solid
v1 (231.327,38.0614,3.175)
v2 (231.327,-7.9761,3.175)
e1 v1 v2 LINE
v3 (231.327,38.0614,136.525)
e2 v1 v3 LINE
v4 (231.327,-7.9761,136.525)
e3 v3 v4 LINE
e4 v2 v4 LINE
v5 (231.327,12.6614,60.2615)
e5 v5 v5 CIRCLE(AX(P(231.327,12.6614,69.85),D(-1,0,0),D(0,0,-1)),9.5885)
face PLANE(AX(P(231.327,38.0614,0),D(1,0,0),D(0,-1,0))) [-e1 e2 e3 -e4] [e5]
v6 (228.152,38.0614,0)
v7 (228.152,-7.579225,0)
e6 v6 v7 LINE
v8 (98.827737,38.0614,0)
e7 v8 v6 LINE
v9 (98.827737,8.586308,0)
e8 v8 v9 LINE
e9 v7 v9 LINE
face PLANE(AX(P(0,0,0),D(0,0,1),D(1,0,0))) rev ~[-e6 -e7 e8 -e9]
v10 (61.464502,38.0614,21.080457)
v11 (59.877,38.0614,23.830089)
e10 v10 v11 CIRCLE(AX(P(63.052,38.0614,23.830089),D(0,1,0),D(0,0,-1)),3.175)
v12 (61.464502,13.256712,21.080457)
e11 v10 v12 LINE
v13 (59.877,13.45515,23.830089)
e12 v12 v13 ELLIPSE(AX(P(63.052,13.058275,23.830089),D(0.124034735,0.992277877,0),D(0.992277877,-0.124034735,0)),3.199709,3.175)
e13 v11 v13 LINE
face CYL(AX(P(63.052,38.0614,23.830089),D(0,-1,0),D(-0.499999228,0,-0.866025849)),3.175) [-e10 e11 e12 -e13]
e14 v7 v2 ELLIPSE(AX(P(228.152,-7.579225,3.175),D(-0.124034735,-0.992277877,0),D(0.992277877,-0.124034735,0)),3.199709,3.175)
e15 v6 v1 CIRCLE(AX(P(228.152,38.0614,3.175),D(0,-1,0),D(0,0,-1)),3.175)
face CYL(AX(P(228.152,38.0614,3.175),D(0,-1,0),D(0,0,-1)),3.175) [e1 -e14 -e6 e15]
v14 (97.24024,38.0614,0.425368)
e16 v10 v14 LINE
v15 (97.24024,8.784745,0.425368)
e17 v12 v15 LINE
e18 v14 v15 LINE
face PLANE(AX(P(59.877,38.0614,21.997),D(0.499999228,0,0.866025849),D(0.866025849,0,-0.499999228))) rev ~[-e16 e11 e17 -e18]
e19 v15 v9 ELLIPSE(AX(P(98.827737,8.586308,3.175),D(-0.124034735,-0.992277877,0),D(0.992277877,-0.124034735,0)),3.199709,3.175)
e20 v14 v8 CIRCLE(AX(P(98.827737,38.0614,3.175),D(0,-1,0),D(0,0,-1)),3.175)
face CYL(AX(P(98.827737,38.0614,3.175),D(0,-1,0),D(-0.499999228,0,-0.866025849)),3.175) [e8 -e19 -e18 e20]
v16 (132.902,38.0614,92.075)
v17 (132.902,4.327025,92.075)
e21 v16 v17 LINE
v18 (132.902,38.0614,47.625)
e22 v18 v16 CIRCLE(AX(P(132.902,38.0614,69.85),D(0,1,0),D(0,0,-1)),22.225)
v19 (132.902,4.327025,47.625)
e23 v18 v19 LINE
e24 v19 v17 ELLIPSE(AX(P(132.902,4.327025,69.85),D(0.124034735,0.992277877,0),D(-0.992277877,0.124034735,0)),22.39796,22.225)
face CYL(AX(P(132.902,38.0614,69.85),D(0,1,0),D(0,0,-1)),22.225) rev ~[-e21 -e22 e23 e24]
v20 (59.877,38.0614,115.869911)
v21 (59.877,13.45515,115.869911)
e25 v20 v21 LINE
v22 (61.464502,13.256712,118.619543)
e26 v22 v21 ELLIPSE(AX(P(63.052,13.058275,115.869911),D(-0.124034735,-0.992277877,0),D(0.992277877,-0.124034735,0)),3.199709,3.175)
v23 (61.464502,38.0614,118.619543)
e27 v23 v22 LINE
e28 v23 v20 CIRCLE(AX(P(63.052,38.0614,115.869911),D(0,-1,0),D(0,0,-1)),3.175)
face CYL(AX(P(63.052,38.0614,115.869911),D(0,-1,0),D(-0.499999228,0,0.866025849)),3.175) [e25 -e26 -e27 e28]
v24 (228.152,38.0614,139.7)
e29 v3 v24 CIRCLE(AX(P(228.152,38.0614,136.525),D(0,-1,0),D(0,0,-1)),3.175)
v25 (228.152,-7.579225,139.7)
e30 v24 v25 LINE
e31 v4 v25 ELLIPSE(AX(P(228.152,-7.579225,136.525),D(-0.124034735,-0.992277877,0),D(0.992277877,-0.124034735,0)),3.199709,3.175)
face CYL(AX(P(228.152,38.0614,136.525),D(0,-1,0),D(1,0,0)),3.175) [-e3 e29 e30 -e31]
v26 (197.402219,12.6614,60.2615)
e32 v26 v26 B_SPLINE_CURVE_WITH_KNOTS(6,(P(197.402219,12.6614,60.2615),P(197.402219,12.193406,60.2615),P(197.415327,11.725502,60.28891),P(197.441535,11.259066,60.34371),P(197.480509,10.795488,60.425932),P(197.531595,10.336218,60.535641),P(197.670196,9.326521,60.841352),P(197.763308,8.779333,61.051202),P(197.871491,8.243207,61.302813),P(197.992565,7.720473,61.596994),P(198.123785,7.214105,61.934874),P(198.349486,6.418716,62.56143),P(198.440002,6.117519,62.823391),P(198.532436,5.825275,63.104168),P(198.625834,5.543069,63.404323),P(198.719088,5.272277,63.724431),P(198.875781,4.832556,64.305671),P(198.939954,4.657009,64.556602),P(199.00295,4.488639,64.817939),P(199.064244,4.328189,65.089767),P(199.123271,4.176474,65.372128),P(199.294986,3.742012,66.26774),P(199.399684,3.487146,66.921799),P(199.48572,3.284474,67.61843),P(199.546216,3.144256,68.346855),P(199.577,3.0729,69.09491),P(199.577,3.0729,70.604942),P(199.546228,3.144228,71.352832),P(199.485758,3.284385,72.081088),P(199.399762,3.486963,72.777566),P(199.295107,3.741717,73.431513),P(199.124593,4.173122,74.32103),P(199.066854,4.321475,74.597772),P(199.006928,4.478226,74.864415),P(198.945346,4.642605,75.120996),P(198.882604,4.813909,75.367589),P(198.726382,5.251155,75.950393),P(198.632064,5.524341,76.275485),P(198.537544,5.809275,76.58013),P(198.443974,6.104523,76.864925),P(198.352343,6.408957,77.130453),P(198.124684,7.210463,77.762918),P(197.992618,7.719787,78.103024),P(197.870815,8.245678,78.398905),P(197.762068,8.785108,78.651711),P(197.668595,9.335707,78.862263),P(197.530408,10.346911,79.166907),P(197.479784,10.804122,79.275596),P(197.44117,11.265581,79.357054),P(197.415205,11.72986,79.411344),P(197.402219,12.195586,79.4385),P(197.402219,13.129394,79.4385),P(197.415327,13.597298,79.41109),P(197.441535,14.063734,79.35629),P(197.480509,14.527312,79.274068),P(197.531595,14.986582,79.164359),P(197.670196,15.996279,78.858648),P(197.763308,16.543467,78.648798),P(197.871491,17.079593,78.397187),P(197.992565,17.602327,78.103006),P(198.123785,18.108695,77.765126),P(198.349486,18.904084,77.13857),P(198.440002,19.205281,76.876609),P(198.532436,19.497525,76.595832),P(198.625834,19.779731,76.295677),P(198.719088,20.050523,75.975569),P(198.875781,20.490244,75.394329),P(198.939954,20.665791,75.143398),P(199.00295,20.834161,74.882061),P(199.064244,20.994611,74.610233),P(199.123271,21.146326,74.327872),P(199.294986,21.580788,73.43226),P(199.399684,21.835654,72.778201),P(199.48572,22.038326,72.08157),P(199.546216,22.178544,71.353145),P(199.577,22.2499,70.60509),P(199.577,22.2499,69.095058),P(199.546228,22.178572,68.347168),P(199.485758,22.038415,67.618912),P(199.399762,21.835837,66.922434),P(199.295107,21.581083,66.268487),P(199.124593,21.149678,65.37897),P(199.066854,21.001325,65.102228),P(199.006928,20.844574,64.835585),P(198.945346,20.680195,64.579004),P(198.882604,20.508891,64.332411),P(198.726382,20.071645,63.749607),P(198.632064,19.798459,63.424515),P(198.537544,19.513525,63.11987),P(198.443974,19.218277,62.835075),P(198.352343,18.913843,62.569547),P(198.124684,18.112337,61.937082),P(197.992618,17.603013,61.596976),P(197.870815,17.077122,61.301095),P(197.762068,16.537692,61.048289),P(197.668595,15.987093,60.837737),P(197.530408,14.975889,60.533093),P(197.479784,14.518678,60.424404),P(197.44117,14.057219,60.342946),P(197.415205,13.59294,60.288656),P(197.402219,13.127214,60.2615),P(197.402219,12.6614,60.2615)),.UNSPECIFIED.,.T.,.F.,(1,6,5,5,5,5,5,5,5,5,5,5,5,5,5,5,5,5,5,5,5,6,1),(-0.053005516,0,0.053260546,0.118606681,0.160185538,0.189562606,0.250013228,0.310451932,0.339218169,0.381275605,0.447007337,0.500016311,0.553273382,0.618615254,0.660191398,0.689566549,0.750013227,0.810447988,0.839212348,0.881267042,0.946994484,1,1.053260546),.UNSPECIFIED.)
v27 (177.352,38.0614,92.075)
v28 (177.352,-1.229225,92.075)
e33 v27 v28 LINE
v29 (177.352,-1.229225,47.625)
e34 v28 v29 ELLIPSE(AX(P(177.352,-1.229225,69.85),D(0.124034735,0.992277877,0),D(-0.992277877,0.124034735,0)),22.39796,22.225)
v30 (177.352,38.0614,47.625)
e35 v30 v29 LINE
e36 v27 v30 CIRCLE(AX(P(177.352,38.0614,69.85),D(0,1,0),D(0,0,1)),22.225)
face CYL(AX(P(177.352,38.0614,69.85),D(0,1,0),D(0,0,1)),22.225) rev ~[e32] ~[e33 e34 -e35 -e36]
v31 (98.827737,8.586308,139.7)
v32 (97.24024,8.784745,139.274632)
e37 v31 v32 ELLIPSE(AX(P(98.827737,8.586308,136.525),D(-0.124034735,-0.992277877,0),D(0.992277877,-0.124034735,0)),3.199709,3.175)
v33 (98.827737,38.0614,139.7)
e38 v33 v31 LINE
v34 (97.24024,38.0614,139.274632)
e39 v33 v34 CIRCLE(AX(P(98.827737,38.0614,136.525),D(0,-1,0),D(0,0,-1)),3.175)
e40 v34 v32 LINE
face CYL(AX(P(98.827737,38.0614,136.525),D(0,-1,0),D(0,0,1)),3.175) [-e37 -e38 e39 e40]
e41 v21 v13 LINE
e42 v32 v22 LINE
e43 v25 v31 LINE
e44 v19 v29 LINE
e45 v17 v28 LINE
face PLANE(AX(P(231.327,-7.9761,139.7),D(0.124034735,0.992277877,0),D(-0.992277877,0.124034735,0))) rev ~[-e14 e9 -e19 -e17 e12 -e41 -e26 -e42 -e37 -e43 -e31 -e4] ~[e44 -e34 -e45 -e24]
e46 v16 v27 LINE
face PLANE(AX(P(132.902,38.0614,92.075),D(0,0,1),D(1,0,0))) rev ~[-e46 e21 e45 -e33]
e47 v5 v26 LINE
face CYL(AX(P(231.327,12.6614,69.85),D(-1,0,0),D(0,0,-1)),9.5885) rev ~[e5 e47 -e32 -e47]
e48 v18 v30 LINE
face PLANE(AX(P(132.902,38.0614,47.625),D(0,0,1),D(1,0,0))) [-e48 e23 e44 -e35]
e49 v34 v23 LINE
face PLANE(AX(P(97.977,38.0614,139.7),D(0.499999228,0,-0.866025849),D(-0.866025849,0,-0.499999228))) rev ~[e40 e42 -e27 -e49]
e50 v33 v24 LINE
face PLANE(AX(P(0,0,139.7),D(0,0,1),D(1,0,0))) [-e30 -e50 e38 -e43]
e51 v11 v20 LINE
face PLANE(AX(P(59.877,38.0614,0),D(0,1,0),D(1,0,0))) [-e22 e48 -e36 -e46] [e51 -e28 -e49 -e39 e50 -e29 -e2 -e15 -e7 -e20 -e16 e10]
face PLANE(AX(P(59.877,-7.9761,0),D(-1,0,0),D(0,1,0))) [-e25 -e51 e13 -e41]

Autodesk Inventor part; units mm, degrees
ref_plane "YZ Plane" through (0, 0, 0) normal (1, 0, 0) x (0, 1, 0)
ref_plane "XZ Plane" through (0, 0, 0) normal (0, 1, 0) x (-1, 0, 0)
ref_plane "XY Plane" through (0, 0, 0) normal (0, 0, 1) x (1, 0, 0)
sketch "Sketch5" plane through (0, 0, 0) normal (0, 0, 1) x (1, 0, 0)
  line L0 (59.877, 38.0614) -> (231.327, 38.0614)
  line L1 (231.327, 38.0614) -> (231.327, -7.9761)
  line L2 (231.327, -7.9761) -> (59.877, -7.9761)
  line L3 (59.877, -7.9761) -> (59.877, 38.0614)
  dimension "d28" = 46.0375
  dimension "d29" = 171.45
extrude "Extrusion4" add sketch "Sketch5" along normal blind 139.7
sketch "Sketch6" plane through (0, 0, 139.7) normal (0, 0, 1) x (1, 0, 0)
  line L0 (231.327, 38.0614) -> (231.327, -7.9761) projected
  line L1 (231.327, -7.9761) -> (59.877, -7.9761) projected
  line L2 (231.327, -7.9761) -> (-73.473, 30.1239)
  line L3 (-73.473, 30.1239) -> (-73.473, -7.9761)
  line L4 (59.877, -7.9761) -> (-73.473, -7.9761)
  dimension "d32" = 304.8
  dimension "d33" = 38.1
extrude "Extrusion5" cut sketch "Sketch6" against normal through all
sketch "Sketch7" plane through (59.877, 38.0614, 0) normal (0, 1, 0) x (1, 0, 0)
  line L0 (0, -139.7) -> (171.45, -139.7) projected
  line L1 (0, 0) -> (0, -139.7) projected
  arc A0 (73.025, -47.625) -> (73.025, -92.075) centre (73.025, -69.85) ccw
  arc A1 (117.475, -92.075) -> (117.475, -47.625) centre (117.475, -69.85) ccw
  line L2 (73.025, -92.075) -> (117.475, -92.075)
  line L3 (73.025, -47.625) -> (117.475, -47.625)
  dimension "d36" = 69.85
  dimension "d37" = 22.225
  dimension "d38" = 73.025
  dimension "d39" = 44.45
extrude "Extrusion6" cut sketch "Sketch7" against normal through all
sketch "Sketch8" plane through (59.877, 38.0614, 0) normal (0, 1, 0) x (1, 0, 0)
  line L0 (0, -139.7) -> (171.45, -139.7) projected
  line L1 (0, 0) -> (171.45, 0) projected
  line L2 (0, 0) -> (0, -139.7) projected
  line L3 (38.1, -139.7) -> (0, -117.703)
  line L4 (0, -21.997) -> (38.1, 0)
  dimension "d42" = 30
  dimension "d43" = 38.1
  dimension "d56" = 30
extrude "Extrusion7" cut sketch "Sketch8" against normal through all
sketch "Sketch9" plane through (231.327, 38.0614, 139.7) normal (1, 0, 0) x (0, 0, -1)
  line L0 (0, 0) -> (0, -46.0375) projected
  line L1 (139.7, 0) -> (0, 0) projected
  point P0 (69.85, -25.4)
  dimension "d46" = 69.85
  dimension "d47" = 25.4
hole "Hole2" at (231.327, 12.6614, 69.85) direction (-1, 0, 0) diameter 19.177 end up to surface thread size "7/8-9 UNC" class "1B" standard "ANSI Unified Screw Threads"
fillet "Fillet2" radius 3.175 6 edges at (97.977, 23.377, 139.7) (59.877, 25.7583, 117.703) (59.877, 25.7583, 21.997) (97.977, 23.377, 0) (231.327, 15.0427, 0) (231.327, 15.0427, 139.7)
properties part number "Wedge"
